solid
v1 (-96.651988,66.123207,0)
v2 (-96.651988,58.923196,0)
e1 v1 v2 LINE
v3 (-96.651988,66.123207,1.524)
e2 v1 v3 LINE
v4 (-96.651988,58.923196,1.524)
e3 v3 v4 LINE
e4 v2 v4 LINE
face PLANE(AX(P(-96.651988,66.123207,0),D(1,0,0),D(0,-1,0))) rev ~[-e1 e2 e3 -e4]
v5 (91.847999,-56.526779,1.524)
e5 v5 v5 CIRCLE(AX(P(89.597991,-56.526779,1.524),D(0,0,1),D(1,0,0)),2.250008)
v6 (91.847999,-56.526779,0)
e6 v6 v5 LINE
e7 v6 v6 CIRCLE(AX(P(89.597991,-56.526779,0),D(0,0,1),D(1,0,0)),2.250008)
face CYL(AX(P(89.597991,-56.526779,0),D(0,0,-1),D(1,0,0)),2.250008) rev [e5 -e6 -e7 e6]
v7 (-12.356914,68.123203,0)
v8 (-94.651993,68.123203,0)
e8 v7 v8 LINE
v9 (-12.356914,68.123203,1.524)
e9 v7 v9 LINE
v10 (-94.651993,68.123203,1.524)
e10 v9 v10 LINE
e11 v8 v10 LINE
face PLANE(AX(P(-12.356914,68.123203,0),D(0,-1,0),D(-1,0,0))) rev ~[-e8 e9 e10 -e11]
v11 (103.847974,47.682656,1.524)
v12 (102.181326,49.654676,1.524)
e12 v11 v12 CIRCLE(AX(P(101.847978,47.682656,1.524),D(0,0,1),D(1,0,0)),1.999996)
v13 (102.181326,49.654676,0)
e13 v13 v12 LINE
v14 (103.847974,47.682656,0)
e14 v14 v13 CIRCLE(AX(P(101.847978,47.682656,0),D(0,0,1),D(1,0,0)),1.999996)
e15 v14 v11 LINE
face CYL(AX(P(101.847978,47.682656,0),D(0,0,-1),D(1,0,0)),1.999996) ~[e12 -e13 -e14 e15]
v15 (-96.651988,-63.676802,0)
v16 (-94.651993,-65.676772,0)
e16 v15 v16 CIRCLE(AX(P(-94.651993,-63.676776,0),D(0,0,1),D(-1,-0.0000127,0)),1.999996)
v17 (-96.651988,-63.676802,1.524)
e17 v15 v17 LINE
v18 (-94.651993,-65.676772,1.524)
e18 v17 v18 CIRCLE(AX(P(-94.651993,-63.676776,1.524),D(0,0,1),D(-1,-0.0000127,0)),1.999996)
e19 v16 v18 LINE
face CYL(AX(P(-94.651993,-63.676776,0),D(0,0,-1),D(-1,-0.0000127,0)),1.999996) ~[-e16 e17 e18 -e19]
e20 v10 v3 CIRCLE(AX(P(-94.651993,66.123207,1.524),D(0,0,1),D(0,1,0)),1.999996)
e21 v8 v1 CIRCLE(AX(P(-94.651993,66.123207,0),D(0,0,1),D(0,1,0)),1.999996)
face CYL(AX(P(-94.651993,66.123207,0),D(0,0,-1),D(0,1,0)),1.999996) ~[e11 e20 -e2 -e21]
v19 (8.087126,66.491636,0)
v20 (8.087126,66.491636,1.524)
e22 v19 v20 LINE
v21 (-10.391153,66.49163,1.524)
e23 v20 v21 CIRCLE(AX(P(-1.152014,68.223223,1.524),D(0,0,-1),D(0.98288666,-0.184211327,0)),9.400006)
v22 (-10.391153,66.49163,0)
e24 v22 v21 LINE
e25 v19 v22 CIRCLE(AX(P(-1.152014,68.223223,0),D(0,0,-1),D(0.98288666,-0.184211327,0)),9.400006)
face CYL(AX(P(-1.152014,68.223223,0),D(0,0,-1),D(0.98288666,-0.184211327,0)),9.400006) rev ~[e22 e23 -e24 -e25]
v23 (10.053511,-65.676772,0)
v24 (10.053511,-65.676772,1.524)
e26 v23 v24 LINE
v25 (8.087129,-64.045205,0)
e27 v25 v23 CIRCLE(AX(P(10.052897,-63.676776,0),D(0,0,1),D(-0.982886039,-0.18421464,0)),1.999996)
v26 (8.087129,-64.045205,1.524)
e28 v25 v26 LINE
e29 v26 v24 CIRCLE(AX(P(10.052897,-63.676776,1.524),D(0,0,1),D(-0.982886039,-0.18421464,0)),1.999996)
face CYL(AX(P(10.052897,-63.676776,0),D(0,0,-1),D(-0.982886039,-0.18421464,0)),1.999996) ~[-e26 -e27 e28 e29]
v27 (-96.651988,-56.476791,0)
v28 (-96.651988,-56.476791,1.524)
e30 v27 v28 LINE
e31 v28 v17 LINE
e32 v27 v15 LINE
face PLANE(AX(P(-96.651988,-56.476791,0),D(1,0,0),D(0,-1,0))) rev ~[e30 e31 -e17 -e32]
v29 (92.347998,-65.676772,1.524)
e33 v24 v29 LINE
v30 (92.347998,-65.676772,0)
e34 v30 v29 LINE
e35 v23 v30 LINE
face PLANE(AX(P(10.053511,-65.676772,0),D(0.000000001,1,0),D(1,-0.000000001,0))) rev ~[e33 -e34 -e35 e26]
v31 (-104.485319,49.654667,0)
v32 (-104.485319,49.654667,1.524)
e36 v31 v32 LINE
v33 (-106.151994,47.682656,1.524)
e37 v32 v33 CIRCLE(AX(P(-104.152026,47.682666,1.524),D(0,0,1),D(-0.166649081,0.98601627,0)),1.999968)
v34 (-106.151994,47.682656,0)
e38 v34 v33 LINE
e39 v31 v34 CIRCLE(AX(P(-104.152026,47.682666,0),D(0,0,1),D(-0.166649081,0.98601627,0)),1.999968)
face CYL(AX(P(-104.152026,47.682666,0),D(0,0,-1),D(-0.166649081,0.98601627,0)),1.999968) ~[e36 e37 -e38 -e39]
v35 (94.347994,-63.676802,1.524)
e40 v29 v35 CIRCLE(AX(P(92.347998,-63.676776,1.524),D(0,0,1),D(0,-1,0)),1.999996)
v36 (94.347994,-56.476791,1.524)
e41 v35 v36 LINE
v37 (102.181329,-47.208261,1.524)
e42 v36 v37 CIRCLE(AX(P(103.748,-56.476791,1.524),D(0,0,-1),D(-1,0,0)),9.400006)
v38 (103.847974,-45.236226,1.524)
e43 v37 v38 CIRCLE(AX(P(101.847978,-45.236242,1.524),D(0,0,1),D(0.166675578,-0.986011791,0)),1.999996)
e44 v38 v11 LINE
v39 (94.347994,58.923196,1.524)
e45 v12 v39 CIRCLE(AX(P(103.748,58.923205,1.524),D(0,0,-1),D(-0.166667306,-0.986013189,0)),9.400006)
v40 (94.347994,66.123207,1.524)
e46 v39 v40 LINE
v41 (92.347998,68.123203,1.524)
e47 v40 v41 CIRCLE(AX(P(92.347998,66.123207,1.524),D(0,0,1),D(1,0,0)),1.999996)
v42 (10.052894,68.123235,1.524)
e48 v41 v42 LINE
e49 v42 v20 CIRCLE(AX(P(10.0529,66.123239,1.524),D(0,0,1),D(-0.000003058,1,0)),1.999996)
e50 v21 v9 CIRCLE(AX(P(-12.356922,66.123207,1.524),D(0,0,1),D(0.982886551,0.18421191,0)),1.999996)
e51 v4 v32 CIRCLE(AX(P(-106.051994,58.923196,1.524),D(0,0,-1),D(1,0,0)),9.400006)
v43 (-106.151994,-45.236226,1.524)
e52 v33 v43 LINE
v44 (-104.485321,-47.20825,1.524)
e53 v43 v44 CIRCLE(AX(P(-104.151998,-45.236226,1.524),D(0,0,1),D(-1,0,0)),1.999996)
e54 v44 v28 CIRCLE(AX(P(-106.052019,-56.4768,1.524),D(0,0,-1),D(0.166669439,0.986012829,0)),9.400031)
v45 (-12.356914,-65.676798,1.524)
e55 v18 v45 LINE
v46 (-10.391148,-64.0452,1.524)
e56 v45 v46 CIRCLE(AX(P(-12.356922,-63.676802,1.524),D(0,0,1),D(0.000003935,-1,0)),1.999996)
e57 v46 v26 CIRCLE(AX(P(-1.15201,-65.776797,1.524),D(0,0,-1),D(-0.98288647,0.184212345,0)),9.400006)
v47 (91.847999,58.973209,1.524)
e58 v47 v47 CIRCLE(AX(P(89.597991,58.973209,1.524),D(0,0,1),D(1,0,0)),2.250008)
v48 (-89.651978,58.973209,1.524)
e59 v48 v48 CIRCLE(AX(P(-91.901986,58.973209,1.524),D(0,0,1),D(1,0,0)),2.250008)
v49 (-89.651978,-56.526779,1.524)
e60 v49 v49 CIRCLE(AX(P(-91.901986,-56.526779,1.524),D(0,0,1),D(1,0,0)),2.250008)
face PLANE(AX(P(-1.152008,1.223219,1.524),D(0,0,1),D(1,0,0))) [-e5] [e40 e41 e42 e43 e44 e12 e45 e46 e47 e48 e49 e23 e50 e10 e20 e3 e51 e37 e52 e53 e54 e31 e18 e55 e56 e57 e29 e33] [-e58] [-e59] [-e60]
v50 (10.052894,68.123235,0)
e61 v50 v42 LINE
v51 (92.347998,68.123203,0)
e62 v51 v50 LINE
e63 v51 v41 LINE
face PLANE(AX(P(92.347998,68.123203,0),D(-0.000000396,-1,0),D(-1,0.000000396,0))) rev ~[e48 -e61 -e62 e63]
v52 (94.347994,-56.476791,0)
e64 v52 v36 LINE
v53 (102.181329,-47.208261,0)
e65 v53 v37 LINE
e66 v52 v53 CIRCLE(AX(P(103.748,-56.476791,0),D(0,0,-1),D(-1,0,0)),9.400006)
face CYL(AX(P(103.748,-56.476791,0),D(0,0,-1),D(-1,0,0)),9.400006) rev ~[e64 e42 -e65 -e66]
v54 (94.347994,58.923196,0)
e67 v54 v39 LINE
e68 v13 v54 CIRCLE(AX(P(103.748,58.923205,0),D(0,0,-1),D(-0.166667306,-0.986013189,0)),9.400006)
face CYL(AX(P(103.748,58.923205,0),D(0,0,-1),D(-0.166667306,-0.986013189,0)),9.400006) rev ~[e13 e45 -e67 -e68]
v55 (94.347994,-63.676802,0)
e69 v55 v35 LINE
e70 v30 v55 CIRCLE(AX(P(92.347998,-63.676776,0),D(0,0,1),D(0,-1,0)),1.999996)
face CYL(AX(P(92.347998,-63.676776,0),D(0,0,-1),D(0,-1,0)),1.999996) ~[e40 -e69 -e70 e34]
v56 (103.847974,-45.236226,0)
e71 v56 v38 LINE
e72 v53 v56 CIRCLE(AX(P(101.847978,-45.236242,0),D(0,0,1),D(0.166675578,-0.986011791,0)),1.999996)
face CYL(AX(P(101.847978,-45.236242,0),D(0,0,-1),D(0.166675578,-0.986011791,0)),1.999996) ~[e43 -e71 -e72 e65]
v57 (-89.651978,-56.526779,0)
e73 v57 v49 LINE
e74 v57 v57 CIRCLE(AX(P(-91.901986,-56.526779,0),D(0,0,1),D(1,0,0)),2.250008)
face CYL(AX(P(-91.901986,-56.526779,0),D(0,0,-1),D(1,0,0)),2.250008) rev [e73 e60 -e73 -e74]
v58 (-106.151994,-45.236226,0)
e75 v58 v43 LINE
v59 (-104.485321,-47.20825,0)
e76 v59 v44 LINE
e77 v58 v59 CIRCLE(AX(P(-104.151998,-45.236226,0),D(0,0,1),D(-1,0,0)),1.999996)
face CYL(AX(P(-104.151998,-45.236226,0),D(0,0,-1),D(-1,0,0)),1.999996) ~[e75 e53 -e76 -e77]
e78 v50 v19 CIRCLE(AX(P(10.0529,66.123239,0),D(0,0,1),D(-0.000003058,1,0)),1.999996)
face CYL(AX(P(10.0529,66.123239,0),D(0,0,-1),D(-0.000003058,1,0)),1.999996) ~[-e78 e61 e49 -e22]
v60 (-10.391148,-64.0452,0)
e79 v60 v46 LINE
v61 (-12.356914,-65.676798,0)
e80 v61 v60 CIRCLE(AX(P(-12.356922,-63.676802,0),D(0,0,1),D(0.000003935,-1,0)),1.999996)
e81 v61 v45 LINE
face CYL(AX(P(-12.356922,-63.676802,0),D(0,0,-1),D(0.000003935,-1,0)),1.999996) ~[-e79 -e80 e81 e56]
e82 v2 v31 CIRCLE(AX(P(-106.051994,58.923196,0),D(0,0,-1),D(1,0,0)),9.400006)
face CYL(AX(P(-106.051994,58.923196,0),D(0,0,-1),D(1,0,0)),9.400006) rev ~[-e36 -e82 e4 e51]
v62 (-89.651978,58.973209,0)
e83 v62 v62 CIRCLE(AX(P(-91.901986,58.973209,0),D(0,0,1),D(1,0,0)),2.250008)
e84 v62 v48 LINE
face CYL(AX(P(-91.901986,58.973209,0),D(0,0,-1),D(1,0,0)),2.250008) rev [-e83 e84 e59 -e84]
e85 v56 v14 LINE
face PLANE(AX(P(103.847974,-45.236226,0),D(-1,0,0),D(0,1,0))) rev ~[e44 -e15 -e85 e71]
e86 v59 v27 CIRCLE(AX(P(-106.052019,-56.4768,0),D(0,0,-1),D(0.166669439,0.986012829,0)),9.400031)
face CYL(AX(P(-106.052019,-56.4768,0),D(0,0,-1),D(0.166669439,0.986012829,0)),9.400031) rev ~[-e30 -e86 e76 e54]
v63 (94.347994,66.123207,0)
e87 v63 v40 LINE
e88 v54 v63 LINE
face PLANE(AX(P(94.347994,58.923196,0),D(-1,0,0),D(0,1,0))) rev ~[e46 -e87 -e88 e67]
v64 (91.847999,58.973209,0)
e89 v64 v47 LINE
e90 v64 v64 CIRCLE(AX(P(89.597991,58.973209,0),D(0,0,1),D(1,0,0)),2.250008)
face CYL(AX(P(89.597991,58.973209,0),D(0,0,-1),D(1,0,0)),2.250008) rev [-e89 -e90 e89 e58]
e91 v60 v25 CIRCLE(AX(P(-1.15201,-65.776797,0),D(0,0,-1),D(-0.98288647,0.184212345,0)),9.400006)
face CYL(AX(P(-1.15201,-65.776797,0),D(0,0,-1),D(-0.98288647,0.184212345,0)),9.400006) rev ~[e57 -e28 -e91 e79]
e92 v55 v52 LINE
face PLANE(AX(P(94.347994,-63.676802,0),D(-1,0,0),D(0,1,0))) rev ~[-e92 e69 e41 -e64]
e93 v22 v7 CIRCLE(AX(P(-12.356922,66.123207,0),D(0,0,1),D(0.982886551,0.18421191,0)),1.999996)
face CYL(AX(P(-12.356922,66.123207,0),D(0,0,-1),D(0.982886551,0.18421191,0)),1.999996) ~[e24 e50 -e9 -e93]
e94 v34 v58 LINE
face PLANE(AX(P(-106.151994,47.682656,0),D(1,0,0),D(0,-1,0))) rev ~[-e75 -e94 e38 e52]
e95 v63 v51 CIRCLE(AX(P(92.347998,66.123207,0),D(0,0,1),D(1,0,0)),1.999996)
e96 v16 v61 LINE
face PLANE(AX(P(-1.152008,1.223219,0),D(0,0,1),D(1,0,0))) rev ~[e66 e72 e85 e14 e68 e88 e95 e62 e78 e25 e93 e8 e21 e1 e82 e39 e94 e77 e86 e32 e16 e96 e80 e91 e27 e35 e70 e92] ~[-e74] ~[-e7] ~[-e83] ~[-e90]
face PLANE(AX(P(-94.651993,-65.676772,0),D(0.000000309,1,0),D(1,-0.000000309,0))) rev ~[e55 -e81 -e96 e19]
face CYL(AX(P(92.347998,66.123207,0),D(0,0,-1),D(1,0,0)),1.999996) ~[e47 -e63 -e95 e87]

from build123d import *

# Parameters (mm, degrees)
F0_R     = 2.2500080016
F1_DEPTH = 1.524


# Not quite as in the source:
# - ends of sketch curves that miss each other by under 0.0002 mm in the source are joined


with BuildPart() as f1:
    # F0 (on Top) → F1 (new body)
    with BuildSketch(Plane.XY):
        with BuildLine():
            Line((-94.6519925541, -65.6767721), (-12.3569142118, -65.6767975))
            ThreePointArc((-12.3569142118, -65.6767975), (-11.0795804522, -65.2157564043), (-10.3911484863, -64.0452001887))
            ThreePointArc((-10.3911484863, -64.0452001887), (-1.1520076605, -56.3767915202), (8.0871293483, -64.0452047877))
            ThreePointArc((8.0871293483, -64.0452047877), (8.7758066433, -65.2159392609), (10.0535111494, -65.6767720058))
            Line((10.0535111494, -65.6767720058), (92.3479979541, -65.6767721))
            ThreePointArc((92.3479979541, -65.6767721), (93.7621995832, -65.0909958659), (94.3479937777, -63.6768016764))
            Line((94.3479937777, -63.6768016764), (94.3479937777, -56.4767913114))
            ThreePointArc((94.3479937777, -56.4767913114), (96.5686254579, -50.4091149721), (102.1813285767, -47.2082611927))
            ThreePointArc((102.1813285767, -47.2082611927), (103.3755112292, -46.5272203825), (103.8479739399, -45.2362255027))
            Line((103.8479739399, -45.2362255027), (103.8479739399, 47.6826559027))
            ThreePointArc((103.8479739399, 47.6826559027), (103.3755051193, 48.9736417855), (102.18132591, 49.6546758171))
            ThreePointArc((102.18132591, 49.6546758171), (96.5686275458, 52.8555266753), (94.3479937777, 58.9231963114))
            Line((94.3479937777, 58.9231963114), (94.3479937777, 66.1232066764))
            ThreePointArc((94.3479937777, 66.1232066764), (93.7622085633, 67.5374172856), (92.3479979541, 68.1232025))
            Line((92.3479979541, 68.1232025), (10.0528942103, 68.1232351277))
            ThreePointArc((10.0528942103, 68.1232351277), (8.7755585629, 67.662193921), (8.0871263436, 66.4916357508))
            ThreePointArc((8.0871263436, 66.4916357508), (-1.1520108709, 58.8232175176), (-10.3911530852, 66.4916297269))
            ThreePointArc((-10.3911530852, 66.4916297269), (-11.0795900575, 67.6621693766), (-12.3569142118, 68.1232025))
            Line((-12.3569142118, 68.1232025), (-94.6519925541, 68.1232025))
            ThreePointArc((-94.6519925541, 68.1232025), (-96.0662031633, 67.5374172856), (-96.6519883777, 66.1232066764))
            Line((-96.6519883777, 66.1232066764), (-96.6519883777, 58.9231963114))
            ThreePointArc((-96.6519883777, 58.9231963114), (-98.8726186915, 52.8555215887), (-104.4853190025, 49.6546668983))
            ThreePointArc((-104.4853190025, 49.6546668983), (-105.6795170362, 48.9736513496), (-106.1519939399, 47.6826559027))
            Line((-106.1519939399, 47.6826559027), (-106.1519939399, -45.2362255027))
            ThreePointArc((-106.1519939399, -45.2362255027), (-105.6795170362, -46.5272209496), (-104.4853212157, -47.2082495912))
            ThreePointArc((-104.4853212157, -47.2082495912), (-98.8726200579, -50.4091149721), (-96.6519883777, -56.4767913114))
            Line((-96.6519883777, -56.4767913114), (-96.6519883777, -63.6768016764))
            ThreePointArc((-96.6519883777, -63.6768016764), (-96.0661941832, -65.0909958659), (-94.6519925541, -65.6767721))
        make_face()
        with Locations((-91.9019855966, -56.526778507)):
            Circle(F0_R, mode=Mode.SUBTRACT)
        with Locations((89.5979909966, -56.526778507)):
            Circle(F0_R, mode=Mode.SUBTRACT)
        with Locations((-91.9019855966, 58.973208907)):
            Circle(F0_R, mode=Mode.SUBTRACT)
        with Locations((89.5979909966, 58.973208907)):
            Circle(F0_R, mode=Mode.SUBTRACT)
    extrude(amount=F1_DEPTH)


solid = f1.part
